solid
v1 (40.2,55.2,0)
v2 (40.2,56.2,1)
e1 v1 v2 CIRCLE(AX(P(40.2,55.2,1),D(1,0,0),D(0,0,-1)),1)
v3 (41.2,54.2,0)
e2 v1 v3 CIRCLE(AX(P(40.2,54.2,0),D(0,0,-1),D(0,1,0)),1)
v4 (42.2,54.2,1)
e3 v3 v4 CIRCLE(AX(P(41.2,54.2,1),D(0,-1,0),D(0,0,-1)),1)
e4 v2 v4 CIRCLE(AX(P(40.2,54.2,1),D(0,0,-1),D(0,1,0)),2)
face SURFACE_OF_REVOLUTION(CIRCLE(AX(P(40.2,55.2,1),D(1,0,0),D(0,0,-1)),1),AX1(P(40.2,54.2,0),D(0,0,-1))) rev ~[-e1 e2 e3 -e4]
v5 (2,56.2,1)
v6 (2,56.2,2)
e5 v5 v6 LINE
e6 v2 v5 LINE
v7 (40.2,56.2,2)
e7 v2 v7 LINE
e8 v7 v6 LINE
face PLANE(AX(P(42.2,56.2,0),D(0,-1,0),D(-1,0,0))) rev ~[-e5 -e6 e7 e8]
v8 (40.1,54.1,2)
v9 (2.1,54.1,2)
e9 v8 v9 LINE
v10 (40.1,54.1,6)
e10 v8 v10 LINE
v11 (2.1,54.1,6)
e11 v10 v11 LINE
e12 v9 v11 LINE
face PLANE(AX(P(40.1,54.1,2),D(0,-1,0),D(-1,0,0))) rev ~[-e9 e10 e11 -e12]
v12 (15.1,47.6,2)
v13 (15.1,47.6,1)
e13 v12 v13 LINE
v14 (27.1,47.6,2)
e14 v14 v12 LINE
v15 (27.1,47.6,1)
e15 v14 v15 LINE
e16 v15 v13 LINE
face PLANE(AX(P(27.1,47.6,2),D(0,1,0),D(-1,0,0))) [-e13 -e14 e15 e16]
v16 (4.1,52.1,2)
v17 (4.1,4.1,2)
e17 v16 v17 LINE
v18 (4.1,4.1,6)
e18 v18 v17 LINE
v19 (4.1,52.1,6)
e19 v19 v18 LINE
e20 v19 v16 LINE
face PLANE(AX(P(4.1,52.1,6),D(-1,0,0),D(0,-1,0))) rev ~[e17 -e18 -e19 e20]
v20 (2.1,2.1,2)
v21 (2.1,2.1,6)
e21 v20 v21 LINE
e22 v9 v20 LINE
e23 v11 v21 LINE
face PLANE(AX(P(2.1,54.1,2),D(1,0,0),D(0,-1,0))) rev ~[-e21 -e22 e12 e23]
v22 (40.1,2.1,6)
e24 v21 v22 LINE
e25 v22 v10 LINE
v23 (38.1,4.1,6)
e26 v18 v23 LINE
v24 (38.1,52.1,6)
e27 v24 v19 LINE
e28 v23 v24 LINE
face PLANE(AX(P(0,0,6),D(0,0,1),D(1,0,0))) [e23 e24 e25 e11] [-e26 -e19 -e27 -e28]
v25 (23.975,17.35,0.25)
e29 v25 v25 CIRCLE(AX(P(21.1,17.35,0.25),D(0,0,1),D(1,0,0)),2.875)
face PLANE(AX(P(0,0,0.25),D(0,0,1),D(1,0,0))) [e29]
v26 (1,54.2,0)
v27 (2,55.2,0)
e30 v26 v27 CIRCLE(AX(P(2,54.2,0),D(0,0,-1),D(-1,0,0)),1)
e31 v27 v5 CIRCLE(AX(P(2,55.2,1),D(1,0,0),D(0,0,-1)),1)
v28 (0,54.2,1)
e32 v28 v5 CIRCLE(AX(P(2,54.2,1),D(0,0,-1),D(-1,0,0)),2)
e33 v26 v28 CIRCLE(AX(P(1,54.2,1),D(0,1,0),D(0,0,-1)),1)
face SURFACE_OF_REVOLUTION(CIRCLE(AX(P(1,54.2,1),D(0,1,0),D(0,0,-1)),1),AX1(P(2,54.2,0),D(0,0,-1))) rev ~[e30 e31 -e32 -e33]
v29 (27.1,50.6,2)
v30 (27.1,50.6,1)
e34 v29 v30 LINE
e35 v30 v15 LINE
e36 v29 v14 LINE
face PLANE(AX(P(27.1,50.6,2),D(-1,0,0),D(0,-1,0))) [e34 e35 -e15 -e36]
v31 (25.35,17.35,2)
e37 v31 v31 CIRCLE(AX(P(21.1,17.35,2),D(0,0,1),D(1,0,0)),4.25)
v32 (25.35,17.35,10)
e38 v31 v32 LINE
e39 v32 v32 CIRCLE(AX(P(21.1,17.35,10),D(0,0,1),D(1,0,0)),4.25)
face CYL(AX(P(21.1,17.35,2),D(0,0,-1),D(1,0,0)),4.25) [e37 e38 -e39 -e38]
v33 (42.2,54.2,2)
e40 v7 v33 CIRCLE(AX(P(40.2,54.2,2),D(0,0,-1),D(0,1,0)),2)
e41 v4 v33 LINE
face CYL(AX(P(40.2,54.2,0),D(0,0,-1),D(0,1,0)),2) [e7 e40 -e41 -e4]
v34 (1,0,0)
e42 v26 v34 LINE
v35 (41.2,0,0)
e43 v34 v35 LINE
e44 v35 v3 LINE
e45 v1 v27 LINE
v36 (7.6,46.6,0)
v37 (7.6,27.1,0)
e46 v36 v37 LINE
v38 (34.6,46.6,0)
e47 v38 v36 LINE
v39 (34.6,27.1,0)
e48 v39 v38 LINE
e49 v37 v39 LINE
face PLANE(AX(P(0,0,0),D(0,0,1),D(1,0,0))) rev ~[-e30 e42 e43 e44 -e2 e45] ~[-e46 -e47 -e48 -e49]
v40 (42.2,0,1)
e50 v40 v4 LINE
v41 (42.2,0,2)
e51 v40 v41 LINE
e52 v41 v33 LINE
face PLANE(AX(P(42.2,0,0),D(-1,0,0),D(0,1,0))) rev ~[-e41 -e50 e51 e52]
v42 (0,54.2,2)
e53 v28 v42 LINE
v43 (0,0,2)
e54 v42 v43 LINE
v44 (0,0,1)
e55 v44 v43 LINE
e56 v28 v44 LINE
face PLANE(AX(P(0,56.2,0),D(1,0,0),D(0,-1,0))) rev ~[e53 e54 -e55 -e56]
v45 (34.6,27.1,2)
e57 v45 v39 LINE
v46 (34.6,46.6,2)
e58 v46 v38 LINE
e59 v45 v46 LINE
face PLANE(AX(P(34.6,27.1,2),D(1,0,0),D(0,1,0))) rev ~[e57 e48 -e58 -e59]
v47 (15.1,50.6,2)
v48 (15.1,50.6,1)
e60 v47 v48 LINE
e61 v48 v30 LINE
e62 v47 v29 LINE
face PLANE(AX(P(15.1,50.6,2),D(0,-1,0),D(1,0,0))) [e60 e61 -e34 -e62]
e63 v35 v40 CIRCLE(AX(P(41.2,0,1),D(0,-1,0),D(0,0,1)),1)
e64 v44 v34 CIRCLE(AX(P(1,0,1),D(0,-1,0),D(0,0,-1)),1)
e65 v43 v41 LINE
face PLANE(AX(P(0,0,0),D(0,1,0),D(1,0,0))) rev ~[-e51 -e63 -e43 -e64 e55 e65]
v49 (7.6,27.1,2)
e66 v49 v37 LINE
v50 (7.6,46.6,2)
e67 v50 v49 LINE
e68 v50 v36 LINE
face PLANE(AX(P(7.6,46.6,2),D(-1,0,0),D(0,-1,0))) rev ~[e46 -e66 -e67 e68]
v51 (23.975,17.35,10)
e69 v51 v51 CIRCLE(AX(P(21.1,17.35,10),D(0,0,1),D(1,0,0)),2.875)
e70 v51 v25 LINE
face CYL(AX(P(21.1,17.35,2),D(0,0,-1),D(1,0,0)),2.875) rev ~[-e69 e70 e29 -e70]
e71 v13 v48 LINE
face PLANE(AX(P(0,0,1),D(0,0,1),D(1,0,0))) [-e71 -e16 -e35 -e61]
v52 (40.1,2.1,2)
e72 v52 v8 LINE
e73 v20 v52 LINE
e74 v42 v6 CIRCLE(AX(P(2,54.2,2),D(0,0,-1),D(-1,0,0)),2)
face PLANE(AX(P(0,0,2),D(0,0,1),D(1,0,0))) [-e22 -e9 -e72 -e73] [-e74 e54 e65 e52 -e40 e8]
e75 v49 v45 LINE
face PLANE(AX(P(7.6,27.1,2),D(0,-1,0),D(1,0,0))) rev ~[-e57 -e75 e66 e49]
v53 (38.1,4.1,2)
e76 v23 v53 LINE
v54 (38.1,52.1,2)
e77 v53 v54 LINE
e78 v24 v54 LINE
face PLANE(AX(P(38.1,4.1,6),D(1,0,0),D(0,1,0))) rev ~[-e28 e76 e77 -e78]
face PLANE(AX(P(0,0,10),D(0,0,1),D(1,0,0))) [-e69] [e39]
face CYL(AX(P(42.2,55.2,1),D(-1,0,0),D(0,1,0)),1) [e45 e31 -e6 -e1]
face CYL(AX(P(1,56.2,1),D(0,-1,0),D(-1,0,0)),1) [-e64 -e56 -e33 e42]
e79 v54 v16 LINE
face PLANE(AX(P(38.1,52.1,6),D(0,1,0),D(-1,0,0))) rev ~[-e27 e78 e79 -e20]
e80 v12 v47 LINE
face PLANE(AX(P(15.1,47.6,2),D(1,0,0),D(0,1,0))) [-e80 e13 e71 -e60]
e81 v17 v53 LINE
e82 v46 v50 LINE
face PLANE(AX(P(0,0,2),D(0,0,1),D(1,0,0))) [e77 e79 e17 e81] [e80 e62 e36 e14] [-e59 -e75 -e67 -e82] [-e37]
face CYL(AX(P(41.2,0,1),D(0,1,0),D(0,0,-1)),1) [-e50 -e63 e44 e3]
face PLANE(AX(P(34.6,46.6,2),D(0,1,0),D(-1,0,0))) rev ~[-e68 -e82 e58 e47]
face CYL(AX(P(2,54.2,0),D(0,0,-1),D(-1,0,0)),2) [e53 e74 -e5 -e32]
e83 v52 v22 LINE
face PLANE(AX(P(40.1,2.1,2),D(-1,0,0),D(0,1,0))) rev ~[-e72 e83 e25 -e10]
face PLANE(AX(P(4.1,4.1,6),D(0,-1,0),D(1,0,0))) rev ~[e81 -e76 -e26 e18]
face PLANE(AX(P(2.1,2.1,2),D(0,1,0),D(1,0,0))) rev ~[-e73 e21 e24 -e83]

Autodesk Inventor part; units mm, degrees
ref_plane "YZ Plane" through (0, 0, 0) normal (1, 0, 0) x (0, 1, 0)
ref_plane "XZ Plane" through (0, 0, 0) normal (0, 1, 0) x (-1, 0, 0)
ref_plane "XY Plane" through (0, 0, 0) normal (0, 0, 1) x (1, 0, 0)
sketch "Sketch2" plane through (0, 0, 0) normal (0, 0, 1) x (1, 0, 0)
  line L0 (0, 0) -> (42.2, 0)
  line L1 (42.2, 0) -> (42.2, 56.2)
  line L2 (42.2, 56.2) -> (0, 56.2)
  line L3 (0, 56.2) -> (0, 0)
  dimension "d0" = 42.2
  dimension "d1" = 56.2
extrude "Extrusion1" add sketch "Sketch2" along normal blind 2
sketch "Sketch4" plane through (0, 0, 2) normal (0, 0, 1) x (1, 0, 0)
  line L0 (2.1, 2.1) -> (40.1, 2.1)
  line L1 (40.1, 2.1) -> (40.1, 54.1)
  line L2 (40.1, 54.1) -> (2.1, 54.1)
  line L3 (2.1, 54.1) -> (2.1, 2.1)
  line L4 (42.2, 0) -> (42.2, 56.2) projected
  line L5 (0, 56.2) -> (0, 0) projected
  line L6 (0, 0) -> (42.2, 0) projected
  line L7 (42.2, 56.2) -> (0, 56.2) projected
  dimension "d12" = 38
  dimension "d13" = 52
  dimension "d49" = 42.2
  dimension "d50" = 56.2
  dimension "d51" = 2.1
  dimension "d52" = 2.1
extrude "Extrusion2" add sketch "Sketch4" along normal blind 4 contours L3 L2 L1 L0
sketch "Sketch5" plane through (0, 0, 6) normal (0, 0, 1) x (1, 0, 0)
  line L0 (4.1, 4.1) -> (38.1, 4.1)
  line L1 (38.1, 4.1) -> (38.1, 52.1)
  line L2 (38.1, 52.1) -> (4.1, 52.1)
  line L3 (4.1, 52.1) -> (4.1, 4.1)
  line L4 (40.1, 2.1) -> (40.1, 54.1) projected
  line L5 (2.1, 54.1) -> (2.1, 2.1) projected
  line L6 (2.1, 2.1) -> (40.1, 2.1) projected
  line L7 (40.1, 54.1) -> (2.1, 54.1) projected
  point P0 (0, 0)
  dimension "d16" = 34
  dimension "d17" = 48
  dimension "d45" = 38
  dimension "d46" = 2
  dimension "d47" = 52
  dimension "d48" = 2
extrude "Extrusion3" cut sketch "Sketch5" against normal blind 4 contours L3 L2 L1 L0
sketch "Sketch6" plane through (0, 0, 2) normal (0, 0, 1) x (1, 0, 0)
  line L0 (7.6, 27.1) -> (34.6, 27.1)
  line L1 (34.6, 27.1) -> (34.6, 46.6)
  line L2 (34.6, 46.6) -> (7.6, 46.6)
  line L3 (7.6, 46.6) -> (7.6, 27.1)
  line L4 (15.1, 50.6) -> (27.1, 50.6)
  line L5 (27.1, 50.6) -> (27.1, 47.6)
  line L6 (27.1, 47.6) -> (15.1, 47.6)
  line L7 (15.1, 47.6) -> (15.1, 50.6)
  line L8 (4.1, 52.1) -> (38.1, 52.1) projected
  line L9 (38.1, 52.1) -> (38.1, 4.1) projected
  line L10 (4.1, 4.1) -> (4.1, 52.1) projected
  point P0 (0, 0)
  dimension "d20" = 27
  dimension "d21" = 19.5
  dimension "d22" = 12
  dimension "d23" = 3
  dimension "d24" = 1
  dimension "d25" = 1.5
  dimension "d42" = 34
  dimension "d43" = 3.5
  dimension "d44" = 11
extrude "Extrusion4" cut sketch "Sketch6" against normal blind 1 contours L4 L5 L6 L7
extrude "Extrusion5" cut sketch "Sketch6" against normal blind 2 contours L3 L2 L1 L0
sketch "Sketch7" plane through (0, 0, 2) normal (0, 0, 1) x (1, 0, 0)
  circle A0 centre (21.1, 17.35) radius 2.875
  circle A1 centre (21.1, 17.35) radius 4.25
  line L0 (38.1, 4.1) -> (4.1, 4.1) projected
  line L1 (34.6, 27.1) -> (7.6, 27.1) projected
  line L2 (38.1, 52.1) -> (38.1, 4.1) projected
  line L3 (4.1, 4.1) -> (4.1, 52.1) projected
  point P0 (0, 0)
  dimension "d30" = 5.75
  dimension "d31" = 8.5
  dimension "d32" = 9
  dimension "d37" = 5.5
  dimension "d39" = 34
  dimension "d40" = 17
extrude "Extrusion6" add sketch "Sketch7" along normal blind 8
extrude "Extrusion7" cut sketch "Sketch7" against normal blind 1.75 contours A0
fillet "Fillet2" radius 1 3 edges at (21.1, 56.2, 0) (42.2, 28.1, 0) (0, 28.1, 0)
fillet "Fillet3" radius 2 4 edges at (0, 56.2, 1.5) (0.2929, 55.9071, 0.2929) (42.2, 56.2, 1.5) (41.9071, 55.9071, 0.2929)
equation "\"d51\" = -0.5 * d12 + 0.5 * d49"
equation "\"d52\" = -0.5 * d13 + 0.5 * d50"
equation "\"d46\" = -0.5 * d16 + 0.5 * d45"
equation "\"d48\" = -0.5 * d17 + 0.5 * d47"
equation "\"d43\" = -0.5 * d20 + 0.5 * d42"
equation "\"d44\" = -0.5 * d22 + 0.5 * d42"
equation "\"d40\" = 0.5 * d39"
properties part number "Enclosure v2" material "PLA Plastic"
